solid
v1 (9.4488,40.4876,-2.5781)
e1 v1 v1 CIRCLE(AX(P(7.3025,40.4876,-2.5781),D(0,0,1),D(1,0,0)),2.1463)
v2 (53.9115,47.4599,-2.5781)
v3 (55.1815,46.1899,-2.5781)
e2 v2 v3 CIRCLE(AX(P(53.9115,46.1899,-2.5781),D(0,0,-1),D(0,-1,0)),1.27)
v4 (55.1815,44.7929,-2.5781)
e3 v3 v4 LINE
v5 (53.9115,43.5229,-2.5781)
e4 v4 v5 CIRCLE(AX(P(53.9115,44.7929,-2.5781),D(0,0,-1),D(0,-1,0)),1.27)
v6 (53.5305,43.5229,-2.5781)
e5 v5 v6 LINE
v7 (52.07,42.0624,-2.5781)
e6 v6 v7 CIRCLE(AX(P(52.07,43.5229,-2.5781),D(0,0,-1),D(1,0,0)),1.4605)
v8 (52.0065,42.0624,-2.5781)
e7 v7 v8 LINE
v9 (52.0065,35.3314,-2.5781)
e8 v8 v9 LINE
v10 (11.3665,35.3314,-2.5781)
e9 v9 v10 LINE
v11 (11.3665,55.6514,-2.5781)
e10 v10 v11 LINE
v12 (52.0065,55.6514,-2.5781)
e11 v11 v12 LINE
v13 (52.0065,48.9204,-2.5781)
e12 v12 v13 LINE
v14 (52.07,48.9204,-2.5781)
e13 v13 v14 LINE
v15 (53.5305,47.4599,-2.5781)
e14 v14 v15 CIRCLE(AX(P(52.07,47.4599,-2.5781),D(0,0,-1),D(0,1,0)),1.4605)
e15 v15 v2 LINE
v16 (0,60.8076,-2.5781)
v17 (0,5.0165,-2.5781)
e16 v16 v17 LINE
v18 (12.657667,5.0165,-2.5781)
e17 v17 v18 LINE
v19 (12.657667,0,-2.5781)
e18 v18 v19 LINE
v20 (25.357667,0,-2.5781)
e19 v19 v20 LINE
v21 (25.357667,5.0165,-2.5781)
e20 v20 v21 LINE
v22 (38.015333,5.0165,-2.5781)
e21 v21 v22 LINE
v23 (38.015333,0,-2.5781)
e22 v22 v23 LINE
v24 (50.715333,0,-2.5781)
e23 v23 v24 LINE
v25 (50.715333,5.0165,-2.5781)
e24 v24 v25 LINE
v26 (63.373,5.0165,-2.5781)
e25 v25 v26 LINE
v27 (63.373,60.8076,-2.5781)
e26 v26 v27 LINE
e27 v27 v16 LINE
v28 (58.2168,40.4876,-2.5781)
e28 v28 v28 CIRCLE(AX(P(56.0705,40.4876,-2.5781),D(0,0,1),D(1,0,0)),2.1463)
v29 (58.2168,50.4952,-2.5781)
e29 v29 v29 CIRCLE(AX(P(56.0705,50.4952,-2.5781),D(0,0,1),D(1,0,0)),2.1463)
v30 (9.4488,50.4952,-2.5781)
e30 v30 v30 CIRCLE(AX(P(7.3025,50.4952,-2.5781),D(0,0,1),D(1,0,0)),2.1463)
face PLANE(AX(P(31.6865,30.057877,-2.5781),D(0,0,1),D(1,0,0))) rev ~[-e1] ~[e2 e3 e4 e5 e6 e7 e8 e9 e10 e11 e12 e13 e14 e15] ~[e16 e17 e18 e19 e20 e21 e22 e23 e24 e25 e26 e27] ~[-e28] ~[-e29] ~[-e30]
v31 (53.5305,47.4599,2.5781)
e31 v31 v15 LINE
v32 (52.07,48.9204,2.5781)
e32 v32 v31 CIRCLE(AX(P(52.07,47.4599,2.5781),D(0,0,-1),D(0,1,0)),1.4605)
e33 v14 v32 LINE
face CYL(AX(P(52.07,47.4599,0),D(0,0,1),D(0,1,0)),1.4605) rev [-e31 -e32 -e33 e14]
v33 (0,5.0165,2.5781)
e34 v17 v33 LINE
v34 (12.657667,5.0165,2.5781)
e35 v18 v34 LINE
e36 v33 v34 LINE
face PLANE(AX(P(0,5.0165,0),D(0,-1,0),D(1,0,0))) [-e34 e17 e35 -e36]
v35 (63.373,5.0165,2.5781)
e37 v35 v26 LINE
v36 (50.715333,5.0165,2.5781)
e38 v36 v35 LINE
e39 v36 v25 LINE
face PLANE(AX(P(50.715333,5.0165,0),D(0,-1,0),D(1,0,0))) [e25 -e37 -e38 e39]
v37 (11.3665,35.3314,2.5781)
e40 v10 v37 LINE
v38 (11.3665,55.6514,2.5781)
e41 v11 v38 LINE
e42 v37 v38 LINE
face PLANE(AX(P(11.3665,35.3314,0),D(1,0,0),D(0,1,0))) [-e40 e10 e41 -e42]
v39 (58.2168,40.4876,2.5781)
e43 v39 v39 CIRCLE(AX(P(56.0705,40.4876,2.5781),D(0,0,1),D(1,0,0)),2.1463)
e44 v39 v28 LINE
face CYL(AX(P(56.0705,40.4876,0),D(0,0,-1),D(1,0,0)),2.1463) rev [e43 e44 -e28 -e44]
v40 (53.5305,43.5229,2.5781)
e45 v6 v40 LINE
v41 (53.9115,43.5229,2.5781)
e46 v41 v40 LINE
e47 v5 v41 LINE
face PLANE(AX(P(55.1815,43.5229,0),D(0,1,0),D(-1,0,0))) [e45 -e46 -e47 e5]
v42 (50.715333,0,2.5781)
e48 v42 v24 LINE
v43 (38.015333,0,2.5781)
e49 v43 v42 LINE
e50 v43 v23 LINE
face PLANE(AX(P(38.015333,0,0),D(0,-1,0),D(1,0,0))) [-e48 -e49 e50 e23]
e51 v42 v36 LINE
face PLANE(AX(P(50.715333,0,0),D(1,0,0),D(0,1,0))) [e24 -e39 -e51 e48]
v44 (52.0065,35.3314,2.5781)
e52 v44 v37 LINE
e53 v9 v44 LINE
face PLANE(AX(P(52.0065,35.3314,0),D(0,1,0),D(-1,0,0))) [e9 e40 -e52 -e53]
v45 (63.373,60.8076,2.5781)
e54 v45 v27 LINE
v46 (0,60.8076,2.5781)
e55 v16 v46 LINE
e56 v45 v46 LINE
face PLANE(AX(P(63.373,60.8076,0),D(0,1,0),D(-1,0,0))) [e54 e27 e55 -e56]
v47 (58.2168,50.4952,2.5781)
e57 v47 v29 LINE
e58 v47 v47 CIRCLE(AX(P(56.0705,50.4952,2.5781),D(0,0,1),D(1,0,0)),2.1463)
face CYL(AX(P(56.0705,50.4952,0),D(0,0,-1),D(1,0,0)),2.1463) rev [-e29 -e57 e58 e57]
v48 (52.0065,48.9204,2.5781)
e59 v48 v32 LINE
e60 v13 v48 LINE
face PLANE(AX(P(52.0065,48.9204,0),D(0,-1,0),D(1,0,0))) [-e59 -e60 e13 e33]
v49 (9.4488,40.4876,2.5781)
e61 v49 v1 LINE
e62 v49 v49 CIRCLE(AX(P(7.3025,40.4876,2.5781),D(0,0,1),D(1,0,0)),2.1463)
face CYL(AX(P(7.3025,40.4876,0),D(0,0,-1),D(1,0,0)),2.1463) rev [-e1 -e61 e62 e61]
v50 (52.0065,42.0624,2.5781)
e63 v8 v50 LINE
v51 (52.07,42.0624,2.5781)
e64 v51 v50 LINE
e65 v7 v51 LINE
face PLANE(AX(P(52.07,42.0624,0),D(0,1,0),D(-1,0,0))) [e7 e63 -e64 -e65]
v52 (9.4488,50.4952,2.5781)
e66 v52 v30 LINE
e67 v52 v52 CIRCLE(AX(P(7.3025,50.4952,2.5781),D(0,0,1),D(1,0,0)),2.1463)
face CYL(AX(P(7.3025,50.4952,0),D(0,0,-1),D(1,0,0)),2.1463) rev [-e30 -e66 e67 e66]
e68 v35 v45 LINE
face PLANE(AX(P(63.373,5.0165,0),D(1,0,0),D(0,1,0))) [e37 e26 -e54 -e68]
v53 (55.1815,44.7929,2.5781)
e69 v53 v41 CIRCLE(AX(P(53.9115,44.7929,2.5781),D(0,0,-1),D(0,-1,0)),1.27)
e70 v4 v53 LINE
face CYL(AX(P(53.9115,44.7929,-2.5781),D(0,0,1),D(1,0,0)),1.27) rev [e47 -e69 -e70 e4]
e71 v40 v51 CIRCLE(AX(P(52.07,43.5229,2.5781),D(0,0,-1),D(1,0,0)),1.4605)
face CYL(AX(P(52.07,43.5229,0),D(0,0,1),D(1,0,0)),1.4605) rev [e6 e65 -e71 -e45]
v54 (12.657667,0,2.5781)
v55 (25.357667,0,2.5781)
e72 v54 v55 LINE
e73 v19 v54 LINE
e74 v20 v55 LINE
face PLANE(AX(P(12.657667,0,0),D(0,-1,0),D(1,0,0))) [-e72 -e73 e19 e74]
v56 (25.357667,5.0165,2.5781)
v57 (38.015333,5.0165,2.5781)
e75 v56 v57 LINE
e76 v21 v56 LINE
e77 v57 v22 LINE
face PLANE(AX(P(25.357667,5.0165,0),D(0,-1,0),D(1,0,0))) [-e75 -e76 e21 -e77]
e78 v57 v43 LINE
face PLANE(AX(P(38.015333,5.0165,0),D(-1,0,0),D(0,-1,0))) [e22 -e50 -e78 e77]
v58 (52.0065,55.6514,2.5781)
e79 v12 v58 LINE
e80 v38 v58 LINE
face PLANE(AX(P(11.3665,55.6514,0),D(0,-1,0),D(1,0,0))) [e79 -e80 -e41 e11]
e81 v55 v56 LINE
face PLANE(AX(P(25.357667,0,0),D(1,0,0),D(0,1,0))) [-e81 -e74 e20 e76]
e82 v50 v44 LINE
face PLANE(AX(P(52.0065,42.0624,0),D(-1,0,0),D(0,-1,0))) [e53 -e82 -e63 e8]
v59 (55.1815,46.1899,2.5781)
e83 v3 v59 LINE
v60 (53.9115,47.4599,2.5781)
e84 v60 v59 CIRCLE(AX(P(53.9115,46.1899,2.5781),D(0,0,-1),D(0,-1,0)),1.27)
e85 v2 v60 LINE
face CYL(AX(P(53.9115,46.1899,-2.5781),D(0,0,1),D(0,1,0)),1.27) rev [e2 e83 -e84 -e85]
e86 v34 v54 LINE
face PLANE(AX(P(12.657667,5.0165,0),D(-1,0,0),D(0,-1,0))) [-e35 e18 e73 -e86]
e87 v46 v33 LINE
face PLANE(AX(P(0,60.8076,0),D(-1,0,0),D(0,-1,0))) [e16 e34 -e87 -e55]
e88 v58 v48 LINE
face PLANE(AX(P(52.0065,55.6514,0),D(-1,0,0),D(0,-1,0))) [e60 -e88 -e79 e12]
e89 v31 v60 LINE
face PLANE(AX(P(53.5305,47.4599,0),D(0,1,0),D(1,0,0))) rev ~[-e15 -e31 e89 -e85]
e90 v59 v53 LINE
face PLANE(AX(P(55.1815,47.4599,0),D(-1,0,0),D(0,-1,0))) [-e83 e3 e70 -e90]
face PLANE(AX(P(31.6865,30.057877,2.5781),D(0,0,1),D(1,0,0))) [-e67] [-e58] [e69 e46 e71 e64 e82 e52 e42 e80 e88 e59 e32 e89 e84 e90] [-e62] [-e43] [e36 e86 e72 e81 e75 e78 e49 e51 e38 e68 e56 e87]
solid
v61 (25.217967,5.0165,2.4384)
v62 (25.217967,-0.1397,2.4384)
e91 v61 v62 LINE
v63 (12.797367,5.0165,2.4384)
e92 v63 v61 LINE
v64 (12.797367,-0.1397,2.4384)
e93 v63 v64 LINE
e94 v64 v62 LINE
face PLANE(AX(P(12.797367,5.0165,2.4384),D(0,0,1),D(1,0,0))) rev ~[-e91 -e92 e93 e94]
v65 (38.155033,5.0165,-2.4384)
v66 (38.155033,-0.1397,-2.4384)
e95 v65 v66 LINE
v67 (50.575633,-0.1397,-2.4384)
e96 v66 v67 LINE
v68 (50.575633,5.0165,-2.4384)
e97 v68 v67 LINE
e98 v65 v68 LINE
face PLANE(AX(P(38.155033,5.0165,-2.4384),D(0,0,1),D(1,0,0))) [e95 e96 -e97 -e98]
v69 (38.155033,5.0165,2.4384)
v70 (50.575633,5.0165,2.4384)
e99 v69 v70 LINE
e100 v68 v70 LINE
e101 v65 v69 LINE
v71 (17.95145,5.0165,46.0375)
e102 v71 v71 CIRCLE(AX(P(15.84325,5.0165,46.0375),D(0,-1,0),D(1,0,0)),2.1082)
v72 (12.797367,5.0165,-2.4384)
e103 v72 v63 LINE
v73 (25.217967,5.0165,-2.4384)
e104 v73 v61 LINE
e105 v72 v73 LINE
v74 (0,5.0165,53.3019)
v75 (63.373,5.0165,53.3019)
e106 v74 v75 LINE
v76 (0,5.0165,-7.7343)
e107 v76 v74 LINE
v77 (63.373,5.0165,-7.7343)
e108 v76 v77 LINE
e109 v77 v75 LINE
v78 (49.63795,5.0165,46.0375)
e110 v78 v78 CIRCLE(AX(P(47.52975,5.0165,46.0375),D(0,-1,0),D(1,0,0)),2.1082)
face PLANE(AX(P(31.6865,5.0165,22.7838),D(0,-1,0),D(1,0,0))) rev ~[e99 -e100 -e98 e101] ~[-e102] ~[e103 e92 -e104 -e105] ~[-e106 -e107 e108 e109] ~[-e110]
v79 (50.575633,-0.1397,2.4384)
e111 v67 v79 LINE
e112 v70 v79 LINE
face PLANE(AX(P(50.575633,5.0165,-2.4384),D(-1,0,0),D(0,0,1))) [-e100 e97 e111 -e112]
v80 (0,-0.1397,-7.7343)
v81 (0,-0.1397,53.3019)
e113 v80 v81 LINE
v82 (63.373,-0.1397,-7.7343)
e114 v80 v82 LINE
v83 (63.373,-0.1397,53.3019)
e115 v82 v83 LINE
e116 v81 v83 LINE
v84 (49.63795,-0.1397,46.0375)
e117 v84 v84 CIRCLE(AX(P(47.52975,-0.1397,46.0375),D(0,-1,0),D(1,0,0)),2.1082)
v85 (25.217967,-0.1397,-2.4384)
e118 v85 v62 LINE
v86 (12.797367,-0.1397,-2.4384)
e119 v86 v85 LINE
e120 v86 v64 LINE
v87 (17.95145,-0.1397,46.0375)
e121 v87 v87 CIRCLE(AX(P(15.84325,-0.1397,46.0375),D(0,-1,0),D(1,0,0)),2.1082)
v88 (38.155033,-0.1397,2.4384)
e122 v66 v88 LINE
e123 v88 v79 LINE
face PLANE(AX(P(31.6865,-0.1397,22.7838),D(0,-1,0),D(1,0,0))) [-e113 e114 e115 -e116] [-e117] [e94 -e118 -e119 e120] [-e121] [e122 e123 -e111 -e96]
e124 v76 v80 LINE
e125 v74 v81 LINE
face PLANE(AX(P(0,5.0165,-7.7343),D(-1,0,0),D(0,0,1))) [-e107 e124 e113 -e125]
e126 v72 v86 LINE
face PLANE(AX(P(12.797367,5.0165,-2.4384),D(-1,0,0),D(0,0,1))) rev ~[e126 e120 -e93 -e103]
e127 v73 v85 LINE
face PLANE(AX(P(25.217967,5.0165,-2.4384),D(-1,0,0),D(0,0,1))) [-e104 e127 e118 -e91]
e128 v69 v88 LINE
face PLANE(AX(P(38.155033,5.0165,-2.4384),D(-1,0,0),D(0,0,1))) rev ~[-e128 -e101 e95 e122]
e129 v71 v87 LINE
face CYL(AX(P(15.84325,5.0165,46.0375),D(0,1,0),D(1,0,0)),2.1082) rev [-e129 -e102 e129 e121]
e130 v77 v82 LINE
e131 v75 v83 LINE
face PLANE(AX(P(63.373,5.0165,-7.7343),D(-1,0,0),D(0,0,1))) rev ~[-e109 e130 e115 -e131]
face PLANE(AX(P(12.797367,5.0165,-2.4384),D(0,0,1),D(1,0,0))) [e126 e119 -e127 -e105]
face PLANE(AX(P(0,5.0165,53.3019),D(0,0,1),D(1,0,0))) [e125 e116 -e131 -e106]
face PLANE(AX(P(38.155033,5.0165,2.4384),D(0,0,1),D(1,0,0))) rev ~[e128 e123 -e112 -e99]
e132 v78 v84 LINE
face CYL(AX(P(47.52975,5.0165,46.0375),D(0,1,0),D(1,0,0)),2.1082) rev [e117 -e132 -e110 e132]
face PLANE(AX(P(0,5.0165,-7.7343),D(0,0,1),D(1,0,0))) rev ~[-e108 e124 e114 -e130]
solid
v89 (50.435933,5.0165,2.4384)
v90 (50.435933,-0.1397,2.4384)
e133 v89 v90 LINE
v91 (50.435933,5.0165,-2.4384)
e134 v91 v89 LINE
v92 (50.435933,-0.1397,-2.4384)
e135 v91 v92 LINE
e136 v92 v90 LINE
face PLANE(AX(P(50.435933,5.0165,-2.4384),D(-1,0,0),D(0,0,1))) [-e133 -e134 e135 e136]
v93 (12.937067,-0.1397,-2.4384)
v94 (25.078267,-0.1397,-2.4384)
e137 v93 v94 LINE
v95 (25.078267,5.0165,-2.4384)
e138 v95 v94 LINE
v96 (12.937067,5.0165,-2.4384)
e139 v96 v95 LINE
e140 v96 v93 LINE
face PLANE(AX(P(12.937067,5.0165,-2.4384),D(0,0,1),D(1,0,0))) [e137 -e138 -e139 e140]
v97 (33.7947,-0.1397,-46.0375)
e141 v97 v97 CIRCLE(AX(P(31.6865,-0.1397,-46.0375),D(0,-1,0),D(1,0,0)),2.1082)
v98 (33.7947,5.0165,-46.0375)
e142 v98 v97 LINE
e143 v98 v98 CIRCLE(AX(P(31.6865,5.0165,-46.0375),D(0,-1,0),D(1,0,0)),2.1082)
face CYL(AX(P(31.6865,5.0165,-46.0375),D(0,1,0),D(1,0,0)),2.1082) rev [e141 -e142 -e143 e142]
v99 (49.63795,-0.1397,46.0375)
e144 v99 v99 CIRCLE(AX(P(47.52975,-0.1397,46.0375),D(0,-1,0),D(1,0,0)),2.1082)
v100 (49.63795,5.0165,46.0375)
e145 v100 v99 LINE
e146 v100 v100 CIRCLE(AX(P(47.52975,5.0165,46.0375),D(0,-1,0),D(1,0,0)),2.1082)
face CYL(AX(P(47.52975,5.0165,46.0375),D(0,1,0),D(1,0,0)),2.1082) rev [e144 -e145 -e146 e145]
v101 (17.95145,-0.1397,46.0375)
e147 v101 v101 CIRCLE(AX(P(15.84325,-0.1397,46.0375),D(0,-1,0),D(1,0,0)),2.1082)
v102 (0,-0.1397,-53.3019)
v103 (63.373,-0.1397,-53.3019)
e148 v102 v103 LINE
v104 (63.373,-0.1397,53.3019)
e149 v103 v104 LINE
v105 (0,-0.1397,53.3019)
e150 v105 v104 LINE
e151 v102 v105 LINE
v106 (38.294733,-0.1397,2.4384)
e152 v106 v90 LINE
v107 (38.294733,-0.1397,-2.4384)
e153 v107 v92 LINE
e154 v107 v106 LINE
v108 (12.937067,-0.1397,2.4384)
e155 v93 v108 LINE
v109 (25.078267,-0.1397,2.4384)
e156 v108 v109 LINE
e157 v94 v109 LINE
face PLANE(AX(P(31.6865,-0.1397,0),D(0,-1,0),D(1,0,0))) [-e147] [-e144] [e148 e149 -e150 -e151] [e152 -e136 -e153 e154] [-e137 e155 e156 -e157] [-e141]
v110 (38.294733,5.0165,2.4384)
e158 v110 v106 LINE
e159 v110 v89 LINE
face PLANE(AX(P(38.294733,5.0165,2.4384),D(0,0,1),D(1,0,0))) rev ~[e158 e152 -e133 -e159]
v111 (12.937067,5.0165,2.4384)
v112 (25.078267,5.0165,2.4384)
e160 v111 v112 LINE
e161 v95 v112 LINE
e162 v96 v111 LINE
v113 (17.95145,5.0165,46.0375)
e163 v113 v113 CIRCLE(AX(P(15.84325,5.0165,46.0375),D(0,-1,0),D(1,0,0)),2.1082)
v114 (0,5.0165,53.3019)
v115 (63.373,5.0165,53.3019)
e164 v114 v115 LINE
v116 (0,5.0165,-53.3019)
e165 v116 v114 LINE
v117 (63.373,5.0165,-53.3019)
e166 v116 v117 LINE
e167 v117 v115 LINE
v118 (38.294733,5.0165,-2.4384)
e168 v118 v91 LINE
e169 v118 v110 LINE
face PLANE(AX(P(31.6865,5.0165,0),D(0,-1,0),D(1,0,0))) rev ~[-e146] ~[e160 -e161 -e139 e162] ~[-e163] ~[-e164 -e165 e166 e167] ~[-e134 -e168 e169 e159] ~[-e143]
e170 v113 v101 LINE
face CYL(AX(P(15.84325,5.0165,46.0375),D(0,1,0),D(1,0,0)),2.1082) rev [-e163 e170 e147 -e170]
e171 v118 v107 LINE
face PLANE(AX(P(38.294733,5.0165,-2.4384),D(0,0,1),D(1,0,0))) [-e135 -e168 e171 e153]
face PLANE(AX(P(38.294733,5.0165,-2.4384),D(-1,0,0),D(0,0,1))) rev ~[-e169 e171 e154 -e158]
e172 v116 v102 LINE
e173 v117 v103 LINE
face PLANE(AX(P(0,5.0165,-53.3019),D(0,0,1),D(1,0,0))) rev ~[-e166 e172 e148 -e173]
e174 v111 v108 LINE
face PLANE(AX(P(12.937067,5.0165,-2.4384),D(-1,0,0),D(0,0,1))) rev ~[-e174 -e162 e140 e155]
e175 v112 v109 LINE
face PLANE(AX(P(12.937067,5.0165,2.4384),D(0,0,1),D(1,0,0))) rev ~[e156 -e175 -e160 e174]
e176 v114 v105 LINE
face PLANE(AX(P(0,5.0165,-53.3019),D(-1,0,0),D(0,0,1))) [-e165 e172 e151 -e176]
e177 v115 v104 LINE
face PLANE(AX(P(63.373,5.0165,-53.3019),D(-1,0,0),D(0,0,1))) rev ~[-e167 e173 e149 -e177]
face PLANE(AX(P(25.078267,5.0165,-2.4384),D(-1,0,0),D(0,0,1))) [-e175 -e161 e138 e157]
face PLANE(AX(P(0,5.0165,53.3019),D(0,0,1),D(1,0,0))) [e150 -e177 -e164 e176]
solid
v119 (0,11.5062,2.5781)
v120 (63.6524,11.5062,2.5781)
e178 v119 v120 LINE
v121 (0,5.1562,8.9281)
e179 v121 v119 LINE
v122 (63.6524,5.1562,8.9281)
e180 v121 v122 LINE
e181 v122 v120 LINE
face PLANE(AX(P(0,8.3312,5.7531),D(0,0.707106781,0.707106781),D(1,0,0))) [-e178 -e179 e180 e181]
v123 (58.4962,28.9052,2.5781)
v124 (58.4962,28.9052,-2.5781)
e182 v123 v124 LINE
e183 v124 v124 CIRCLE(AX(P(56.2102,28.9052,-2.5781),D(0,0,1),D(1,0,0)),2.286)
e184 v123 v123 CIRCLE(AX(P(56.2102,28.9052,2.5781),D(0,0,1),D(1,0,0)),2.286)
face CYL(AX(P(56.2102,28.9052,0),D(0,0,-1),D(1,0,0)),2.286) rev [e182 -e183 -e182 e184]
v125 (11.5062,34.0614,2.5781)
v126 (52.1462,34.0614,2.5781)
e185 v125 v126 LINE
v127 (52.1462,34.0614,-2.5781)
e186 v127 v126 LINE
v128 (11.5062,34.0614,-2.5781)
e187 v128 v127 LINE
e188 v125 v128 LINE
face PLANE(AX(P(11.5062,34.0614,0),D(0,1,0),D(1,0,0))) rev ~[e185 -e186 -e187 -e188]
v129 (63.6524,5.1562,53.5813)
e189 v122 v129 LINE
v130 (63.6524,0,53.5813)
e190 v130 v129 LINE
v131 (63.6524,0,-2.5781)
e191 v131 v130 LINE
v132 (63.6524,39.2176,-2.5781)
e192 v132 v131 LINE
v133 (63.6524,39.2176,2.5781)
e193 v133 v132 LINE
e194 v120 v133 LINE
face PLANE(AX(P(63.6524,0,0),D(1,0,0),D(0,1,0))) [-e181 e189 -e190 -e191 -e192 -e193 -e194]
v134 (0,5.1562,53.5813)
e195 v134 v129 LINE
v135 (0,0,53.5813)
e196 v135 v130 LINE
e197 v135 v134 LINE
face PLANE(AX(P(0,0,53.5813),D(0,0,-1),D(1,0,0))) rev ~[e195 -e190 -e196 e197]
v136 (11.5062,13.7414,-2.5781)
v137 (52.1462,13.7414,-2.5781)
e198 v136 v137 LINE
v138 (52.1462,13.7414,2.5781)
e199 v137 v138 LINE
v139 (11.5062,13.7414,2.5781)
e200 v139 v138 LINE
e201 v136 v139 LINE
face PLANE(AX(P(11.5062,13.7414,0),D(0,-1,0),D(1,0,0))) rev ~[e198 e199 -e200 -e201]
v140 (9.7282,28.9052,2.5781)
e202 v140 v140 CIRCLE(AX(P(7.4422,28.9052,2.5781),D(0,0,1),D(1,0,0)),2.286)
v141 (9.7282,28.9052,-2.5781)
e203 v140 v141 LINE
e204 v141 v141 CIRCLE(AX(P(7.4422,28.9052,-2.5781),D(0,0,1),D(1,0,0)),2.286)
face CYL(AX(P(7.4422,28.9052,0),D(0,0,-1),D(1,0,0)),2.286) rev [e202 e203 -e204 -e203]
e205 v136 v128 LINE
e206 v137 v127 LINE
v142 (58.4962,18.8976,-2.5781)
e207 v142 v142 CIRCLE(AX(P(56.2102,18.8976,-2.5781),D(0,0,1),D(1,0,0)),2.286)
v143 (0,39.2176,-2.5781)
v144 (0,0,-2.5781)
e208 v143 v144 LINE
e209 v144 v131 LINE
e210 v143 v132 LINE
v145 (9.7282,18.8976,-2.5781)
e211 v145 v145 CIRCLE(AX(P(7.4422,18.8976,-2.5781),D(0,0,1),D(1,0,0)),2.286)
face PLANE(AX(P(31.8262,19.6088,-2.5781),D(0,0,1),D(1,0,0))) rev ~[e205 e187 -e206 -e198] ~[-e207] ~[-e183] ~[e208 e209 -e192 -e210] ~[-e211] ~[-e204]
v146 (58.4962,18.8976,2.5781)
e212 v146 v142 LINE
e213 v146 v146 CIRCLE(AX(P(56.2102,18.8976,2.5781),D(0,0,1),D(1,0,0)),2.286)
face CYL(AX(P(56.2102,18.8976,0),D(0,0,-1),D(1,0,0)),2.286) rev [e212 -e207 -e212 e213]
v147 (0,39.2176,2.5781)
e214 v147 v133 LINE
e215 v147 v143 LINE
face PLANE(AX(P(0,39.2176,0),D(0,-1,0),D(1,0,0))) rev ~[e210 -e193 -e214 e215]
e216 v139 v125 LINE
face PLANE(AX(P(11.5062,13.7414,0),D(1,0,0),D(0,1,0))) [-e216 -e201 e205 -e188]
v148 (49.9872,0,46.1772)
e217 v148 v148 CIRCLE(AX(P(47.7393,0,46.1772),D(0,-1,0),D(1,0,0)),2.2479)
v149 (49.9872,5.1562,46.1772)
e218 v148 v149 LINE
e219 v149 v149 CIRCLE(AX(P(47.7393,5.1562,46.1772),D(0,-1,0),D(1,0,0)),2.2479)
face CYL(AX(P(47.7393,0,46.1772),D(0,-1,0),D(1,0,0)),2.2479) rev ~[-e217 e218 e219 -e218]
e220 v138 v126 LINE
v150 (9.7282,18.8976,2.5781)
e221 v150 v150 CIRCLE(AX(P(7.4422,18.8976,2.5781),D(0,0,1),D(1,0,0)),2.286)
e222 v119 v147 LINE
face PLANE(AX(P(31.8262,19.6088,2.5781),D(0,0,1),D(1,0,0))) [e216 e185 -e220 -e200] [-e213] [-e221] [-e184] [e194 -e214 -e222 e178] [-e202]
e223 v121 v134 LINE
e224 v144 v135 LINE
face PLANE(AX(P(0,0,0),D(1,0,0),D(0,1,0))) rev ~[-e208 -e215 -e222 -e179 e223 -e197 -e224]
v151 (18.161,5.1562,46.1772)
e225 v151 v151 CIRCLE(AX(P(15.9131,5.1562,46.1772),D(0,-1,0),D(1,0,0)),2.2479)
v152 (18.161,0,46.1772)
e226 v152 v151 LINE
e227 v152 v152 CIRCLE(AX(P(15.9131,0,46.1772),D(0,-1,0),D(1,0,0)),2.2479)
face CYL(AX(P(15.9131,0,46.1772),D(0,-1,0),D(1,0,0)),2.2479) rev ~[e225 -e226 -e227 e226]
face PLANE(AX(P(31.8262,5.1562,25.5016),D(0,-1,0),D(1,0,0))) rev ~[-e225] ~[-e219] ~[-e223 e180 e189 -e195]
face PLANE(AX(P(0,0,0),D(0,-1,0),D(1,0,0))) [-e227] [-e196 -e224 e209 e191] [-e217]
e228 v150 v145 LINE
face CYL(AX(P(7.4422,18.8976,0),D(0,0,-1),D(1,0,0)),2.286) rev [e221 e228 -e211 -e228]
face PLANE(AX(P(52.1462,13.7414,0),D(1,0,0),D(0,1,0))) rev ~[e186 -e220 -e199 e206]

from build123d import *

# Parameters (mm, degrees)
F1_W      = 63.6524
F1_H      = 39.2176
F1_R      = 2.286
F1_W_2    = 40.64
F1_H_2    = 20.32
F2_DEPTH  = 2.5781
F3_W      = 63.6524
F3_H      = 56.1594
F3_R      = 2.2479
F4_DEPTH  = 5.1562
F5_SIZE   = 6.35
F6_R      = 2.1463
F7_DEPTH  = 2.5781
F8_W      = 63.373
F8_H      = 61.0362
F8_W_2    = 12.4206
F8_H_2    = 4.8768
F8_R      = 2.1082
F9_DEPTH  = 5.1562
F10_R     = 1.27
F11_W     = 63.373
F11_H     = 106.6038
F11_R     = 2.1082
F11_W_2   = 12.1412
F11_H_2   = 4.8768
F12_DEPTH = 5.1562


# Not quite as in the source:
# - a variable given as a bare number and used for a length is read in inches; the dataset says mm whatever the document's units were


with BuildPart() as f2:
    # F1 (on Top) → F2 (new body, symmetric)
    with BuildSketch(Plane.XY):
        with Locations((31.8262, 19.6088)):
            Rectangle(F1_W, F1_H)
        with Locations((7.4422, 18.8976)):
            Circle(F1_R, mode=Mode.SUBTRACT)
        with Locations((56.2102, 18.8976)):
            Circle(F1_R, mode=Mode.SUBTRACT)
        with Locations((7.4422, 28.9052)):
            Circle(F1_R, mode=Mode.SUBTRACT)
        with Locations((31.8262, 23.9014)):
            Rectangle(F1_W_2, F1_H_2, mode=Mode.SUBTRACT)
        with Locations((56.2102, 28.9052)):
            Circle(F1_R, mode=Mode.SUBTRACT)
    extrude(amount=F2_DEPTH, both=True)

    # F3 (on Front) → F4 (join)
    with BuildSketch(Plane.XZ):
        with Locations((31.8262, 25.5016)):
            Rectangle(F3_W, F3_H)
        with Locations((15.9131, 46.1772)):
            Circle(F3_R, mode=Mode.SUBTRACT)
        with Locations((47.7393, 46.1772)):
            Circle(F3_R, mode=Mode.SUBTRACT)
    extrude(amount=-F4_DEPTH)

    # F5
    f5_edges = [f2.edges().sort_by_distance(p)[0] for p in [
        (31.8262, 5.1562, 2.5781),
    ]]
    chamfer(f5_edges, length=F5_SIZE)


with BuildPart() as f7:
    # F6 (on Top) → F7 (new body, symmetric)
    with BuildSketch(Plane.XY):
        Polygon((63.373, 60.8076), (0, 60.8076), (0, 5.0165), (12.6576666667, 5.0165), (12.6576666667, 0), (25.3576666667, 0), (25.3576666667, 5.0165), (38.0153333333, 5.0165), (38.0153333333, 0), (50.7153333333, 0), (50.7153333333, 5.0165), (63.373, 5.0165), align=None)
        with Locations((7.3025, 40.4876)):
            Circle(F6_R, mode=Mode.SUBTRACT)
        with Locations((7.3025, 50.4952)):
            Circle(F6_R, mode=Mode.SUBTRACT)
        with BuildLine():
            Line((11.3665, 35.3314), (11.3665, 55.6514))
            Line((11.3665, 55.6514), (52.0065, 55.6514))
            Line((52.0065, 55.6514), (52.0065, 48.9204))
            Line((52.0065, 48.9204), (52.07, 48.9204))
            ThreePointArc((52.07, 48.9204), (53.1027294539, 48.4926294539), (53.5305, 47.4599))
            Line((53.5305, 47.4599), (55.1815, 47.4599))
            Line((55.1815, 47.4599), (55.1815, 43.5229))
            Line((55.1815, 43.5229), (53.5305, 43.5229))
            ThreePointArc((53.5305, 43.5229), (53.1027294539, 42.4901705461), (52.07, 42.0624))
            Line((52.07, 42.0624), (52.0065, 42.0624))
            Line((52.0065, 42.0624), (52.0065, 35.3314))
            Line((52.0065, 35.3314), (11.3665, 35.3314))
        make_face(mode=Mode.SUBTRACT)
        with Locations((56.0705, 40.4876)):
            Circle(F6_R, mode=Mode.SUBTRACT)
        with Locations((56.0705, 50.4952)):
            Circle(F6_R, mode=Mode.SUBTRACT)
    extrude(amount=F7_DEPTH, both=True)

    # F10
    f10_edges = [f7.edges().sort_by_distance(p)[0] for p in [
        (55.1815, 47.4599, 0),
        (55.1815, 43.5229, 0),
    ]]
    fillet(f10_edges, radius=F10_R)


with BuildPart() as f9:
    # F8 (on face) → F9 (new body)
    with BuildSketch(Plane.XZ.offset(-5.0165)):
        with Locations((31.6865, 22.7838)):
            Rectangle(F8_W, F8_H)
        with Locations((19.0076666667, 0)):
            Rectangle(F8_W_2, F8_H_2, mode=Mode.SUBTRACT)
        with Locations((44.3653333333, 0)):
            Rectangle(F8_W_2, F8_H_2, mode=Mode.SUBTRACT)
        with Locations((15.84325, 46.0375)):
            Circle(F8_R, mode=Mode.SUBTRACT)
        with Locations((47.52975, 46.0375)):
            Circle(F8_R, mode=Mode.SUBTRACT)
    extrude(amount=F9_DEPTH)


with BuildPart() as f12:
    # F11 (on face) → F12 (new body)
    with BuildSketch(Plane.XZ.offset(-5.0165)):
        with Locations((31.6865, 0)):
            Rectangle(F11_W, F11_H)
        with Locations((31.6865, -46.0375)):
            Circle(F11_R, mode=Mode.SUBTRACT)
        with Locations((19.0076666667, 0)):
            Rectangle(F11_W_2, F11_H_2, mode=Mode.SUBTRACT)
        with Locations((15.84325, 46.0375)):
            Circle(F11_R, mode=Mode.SUBTRACT)
        with Locations((44.3653333333, 0)):
            Rectangle(F11_W_2, F11_H_2, mode=Mode.SUBTRACT)
        with Locations((47.52975, 46.0375)):
            Circle(F11_R, mode=Mode.SUBTRACT)
    extrude(amount=F12_DEPTH)


solid = Compound([f2.part, f7.part, f9.part, f12.part])
